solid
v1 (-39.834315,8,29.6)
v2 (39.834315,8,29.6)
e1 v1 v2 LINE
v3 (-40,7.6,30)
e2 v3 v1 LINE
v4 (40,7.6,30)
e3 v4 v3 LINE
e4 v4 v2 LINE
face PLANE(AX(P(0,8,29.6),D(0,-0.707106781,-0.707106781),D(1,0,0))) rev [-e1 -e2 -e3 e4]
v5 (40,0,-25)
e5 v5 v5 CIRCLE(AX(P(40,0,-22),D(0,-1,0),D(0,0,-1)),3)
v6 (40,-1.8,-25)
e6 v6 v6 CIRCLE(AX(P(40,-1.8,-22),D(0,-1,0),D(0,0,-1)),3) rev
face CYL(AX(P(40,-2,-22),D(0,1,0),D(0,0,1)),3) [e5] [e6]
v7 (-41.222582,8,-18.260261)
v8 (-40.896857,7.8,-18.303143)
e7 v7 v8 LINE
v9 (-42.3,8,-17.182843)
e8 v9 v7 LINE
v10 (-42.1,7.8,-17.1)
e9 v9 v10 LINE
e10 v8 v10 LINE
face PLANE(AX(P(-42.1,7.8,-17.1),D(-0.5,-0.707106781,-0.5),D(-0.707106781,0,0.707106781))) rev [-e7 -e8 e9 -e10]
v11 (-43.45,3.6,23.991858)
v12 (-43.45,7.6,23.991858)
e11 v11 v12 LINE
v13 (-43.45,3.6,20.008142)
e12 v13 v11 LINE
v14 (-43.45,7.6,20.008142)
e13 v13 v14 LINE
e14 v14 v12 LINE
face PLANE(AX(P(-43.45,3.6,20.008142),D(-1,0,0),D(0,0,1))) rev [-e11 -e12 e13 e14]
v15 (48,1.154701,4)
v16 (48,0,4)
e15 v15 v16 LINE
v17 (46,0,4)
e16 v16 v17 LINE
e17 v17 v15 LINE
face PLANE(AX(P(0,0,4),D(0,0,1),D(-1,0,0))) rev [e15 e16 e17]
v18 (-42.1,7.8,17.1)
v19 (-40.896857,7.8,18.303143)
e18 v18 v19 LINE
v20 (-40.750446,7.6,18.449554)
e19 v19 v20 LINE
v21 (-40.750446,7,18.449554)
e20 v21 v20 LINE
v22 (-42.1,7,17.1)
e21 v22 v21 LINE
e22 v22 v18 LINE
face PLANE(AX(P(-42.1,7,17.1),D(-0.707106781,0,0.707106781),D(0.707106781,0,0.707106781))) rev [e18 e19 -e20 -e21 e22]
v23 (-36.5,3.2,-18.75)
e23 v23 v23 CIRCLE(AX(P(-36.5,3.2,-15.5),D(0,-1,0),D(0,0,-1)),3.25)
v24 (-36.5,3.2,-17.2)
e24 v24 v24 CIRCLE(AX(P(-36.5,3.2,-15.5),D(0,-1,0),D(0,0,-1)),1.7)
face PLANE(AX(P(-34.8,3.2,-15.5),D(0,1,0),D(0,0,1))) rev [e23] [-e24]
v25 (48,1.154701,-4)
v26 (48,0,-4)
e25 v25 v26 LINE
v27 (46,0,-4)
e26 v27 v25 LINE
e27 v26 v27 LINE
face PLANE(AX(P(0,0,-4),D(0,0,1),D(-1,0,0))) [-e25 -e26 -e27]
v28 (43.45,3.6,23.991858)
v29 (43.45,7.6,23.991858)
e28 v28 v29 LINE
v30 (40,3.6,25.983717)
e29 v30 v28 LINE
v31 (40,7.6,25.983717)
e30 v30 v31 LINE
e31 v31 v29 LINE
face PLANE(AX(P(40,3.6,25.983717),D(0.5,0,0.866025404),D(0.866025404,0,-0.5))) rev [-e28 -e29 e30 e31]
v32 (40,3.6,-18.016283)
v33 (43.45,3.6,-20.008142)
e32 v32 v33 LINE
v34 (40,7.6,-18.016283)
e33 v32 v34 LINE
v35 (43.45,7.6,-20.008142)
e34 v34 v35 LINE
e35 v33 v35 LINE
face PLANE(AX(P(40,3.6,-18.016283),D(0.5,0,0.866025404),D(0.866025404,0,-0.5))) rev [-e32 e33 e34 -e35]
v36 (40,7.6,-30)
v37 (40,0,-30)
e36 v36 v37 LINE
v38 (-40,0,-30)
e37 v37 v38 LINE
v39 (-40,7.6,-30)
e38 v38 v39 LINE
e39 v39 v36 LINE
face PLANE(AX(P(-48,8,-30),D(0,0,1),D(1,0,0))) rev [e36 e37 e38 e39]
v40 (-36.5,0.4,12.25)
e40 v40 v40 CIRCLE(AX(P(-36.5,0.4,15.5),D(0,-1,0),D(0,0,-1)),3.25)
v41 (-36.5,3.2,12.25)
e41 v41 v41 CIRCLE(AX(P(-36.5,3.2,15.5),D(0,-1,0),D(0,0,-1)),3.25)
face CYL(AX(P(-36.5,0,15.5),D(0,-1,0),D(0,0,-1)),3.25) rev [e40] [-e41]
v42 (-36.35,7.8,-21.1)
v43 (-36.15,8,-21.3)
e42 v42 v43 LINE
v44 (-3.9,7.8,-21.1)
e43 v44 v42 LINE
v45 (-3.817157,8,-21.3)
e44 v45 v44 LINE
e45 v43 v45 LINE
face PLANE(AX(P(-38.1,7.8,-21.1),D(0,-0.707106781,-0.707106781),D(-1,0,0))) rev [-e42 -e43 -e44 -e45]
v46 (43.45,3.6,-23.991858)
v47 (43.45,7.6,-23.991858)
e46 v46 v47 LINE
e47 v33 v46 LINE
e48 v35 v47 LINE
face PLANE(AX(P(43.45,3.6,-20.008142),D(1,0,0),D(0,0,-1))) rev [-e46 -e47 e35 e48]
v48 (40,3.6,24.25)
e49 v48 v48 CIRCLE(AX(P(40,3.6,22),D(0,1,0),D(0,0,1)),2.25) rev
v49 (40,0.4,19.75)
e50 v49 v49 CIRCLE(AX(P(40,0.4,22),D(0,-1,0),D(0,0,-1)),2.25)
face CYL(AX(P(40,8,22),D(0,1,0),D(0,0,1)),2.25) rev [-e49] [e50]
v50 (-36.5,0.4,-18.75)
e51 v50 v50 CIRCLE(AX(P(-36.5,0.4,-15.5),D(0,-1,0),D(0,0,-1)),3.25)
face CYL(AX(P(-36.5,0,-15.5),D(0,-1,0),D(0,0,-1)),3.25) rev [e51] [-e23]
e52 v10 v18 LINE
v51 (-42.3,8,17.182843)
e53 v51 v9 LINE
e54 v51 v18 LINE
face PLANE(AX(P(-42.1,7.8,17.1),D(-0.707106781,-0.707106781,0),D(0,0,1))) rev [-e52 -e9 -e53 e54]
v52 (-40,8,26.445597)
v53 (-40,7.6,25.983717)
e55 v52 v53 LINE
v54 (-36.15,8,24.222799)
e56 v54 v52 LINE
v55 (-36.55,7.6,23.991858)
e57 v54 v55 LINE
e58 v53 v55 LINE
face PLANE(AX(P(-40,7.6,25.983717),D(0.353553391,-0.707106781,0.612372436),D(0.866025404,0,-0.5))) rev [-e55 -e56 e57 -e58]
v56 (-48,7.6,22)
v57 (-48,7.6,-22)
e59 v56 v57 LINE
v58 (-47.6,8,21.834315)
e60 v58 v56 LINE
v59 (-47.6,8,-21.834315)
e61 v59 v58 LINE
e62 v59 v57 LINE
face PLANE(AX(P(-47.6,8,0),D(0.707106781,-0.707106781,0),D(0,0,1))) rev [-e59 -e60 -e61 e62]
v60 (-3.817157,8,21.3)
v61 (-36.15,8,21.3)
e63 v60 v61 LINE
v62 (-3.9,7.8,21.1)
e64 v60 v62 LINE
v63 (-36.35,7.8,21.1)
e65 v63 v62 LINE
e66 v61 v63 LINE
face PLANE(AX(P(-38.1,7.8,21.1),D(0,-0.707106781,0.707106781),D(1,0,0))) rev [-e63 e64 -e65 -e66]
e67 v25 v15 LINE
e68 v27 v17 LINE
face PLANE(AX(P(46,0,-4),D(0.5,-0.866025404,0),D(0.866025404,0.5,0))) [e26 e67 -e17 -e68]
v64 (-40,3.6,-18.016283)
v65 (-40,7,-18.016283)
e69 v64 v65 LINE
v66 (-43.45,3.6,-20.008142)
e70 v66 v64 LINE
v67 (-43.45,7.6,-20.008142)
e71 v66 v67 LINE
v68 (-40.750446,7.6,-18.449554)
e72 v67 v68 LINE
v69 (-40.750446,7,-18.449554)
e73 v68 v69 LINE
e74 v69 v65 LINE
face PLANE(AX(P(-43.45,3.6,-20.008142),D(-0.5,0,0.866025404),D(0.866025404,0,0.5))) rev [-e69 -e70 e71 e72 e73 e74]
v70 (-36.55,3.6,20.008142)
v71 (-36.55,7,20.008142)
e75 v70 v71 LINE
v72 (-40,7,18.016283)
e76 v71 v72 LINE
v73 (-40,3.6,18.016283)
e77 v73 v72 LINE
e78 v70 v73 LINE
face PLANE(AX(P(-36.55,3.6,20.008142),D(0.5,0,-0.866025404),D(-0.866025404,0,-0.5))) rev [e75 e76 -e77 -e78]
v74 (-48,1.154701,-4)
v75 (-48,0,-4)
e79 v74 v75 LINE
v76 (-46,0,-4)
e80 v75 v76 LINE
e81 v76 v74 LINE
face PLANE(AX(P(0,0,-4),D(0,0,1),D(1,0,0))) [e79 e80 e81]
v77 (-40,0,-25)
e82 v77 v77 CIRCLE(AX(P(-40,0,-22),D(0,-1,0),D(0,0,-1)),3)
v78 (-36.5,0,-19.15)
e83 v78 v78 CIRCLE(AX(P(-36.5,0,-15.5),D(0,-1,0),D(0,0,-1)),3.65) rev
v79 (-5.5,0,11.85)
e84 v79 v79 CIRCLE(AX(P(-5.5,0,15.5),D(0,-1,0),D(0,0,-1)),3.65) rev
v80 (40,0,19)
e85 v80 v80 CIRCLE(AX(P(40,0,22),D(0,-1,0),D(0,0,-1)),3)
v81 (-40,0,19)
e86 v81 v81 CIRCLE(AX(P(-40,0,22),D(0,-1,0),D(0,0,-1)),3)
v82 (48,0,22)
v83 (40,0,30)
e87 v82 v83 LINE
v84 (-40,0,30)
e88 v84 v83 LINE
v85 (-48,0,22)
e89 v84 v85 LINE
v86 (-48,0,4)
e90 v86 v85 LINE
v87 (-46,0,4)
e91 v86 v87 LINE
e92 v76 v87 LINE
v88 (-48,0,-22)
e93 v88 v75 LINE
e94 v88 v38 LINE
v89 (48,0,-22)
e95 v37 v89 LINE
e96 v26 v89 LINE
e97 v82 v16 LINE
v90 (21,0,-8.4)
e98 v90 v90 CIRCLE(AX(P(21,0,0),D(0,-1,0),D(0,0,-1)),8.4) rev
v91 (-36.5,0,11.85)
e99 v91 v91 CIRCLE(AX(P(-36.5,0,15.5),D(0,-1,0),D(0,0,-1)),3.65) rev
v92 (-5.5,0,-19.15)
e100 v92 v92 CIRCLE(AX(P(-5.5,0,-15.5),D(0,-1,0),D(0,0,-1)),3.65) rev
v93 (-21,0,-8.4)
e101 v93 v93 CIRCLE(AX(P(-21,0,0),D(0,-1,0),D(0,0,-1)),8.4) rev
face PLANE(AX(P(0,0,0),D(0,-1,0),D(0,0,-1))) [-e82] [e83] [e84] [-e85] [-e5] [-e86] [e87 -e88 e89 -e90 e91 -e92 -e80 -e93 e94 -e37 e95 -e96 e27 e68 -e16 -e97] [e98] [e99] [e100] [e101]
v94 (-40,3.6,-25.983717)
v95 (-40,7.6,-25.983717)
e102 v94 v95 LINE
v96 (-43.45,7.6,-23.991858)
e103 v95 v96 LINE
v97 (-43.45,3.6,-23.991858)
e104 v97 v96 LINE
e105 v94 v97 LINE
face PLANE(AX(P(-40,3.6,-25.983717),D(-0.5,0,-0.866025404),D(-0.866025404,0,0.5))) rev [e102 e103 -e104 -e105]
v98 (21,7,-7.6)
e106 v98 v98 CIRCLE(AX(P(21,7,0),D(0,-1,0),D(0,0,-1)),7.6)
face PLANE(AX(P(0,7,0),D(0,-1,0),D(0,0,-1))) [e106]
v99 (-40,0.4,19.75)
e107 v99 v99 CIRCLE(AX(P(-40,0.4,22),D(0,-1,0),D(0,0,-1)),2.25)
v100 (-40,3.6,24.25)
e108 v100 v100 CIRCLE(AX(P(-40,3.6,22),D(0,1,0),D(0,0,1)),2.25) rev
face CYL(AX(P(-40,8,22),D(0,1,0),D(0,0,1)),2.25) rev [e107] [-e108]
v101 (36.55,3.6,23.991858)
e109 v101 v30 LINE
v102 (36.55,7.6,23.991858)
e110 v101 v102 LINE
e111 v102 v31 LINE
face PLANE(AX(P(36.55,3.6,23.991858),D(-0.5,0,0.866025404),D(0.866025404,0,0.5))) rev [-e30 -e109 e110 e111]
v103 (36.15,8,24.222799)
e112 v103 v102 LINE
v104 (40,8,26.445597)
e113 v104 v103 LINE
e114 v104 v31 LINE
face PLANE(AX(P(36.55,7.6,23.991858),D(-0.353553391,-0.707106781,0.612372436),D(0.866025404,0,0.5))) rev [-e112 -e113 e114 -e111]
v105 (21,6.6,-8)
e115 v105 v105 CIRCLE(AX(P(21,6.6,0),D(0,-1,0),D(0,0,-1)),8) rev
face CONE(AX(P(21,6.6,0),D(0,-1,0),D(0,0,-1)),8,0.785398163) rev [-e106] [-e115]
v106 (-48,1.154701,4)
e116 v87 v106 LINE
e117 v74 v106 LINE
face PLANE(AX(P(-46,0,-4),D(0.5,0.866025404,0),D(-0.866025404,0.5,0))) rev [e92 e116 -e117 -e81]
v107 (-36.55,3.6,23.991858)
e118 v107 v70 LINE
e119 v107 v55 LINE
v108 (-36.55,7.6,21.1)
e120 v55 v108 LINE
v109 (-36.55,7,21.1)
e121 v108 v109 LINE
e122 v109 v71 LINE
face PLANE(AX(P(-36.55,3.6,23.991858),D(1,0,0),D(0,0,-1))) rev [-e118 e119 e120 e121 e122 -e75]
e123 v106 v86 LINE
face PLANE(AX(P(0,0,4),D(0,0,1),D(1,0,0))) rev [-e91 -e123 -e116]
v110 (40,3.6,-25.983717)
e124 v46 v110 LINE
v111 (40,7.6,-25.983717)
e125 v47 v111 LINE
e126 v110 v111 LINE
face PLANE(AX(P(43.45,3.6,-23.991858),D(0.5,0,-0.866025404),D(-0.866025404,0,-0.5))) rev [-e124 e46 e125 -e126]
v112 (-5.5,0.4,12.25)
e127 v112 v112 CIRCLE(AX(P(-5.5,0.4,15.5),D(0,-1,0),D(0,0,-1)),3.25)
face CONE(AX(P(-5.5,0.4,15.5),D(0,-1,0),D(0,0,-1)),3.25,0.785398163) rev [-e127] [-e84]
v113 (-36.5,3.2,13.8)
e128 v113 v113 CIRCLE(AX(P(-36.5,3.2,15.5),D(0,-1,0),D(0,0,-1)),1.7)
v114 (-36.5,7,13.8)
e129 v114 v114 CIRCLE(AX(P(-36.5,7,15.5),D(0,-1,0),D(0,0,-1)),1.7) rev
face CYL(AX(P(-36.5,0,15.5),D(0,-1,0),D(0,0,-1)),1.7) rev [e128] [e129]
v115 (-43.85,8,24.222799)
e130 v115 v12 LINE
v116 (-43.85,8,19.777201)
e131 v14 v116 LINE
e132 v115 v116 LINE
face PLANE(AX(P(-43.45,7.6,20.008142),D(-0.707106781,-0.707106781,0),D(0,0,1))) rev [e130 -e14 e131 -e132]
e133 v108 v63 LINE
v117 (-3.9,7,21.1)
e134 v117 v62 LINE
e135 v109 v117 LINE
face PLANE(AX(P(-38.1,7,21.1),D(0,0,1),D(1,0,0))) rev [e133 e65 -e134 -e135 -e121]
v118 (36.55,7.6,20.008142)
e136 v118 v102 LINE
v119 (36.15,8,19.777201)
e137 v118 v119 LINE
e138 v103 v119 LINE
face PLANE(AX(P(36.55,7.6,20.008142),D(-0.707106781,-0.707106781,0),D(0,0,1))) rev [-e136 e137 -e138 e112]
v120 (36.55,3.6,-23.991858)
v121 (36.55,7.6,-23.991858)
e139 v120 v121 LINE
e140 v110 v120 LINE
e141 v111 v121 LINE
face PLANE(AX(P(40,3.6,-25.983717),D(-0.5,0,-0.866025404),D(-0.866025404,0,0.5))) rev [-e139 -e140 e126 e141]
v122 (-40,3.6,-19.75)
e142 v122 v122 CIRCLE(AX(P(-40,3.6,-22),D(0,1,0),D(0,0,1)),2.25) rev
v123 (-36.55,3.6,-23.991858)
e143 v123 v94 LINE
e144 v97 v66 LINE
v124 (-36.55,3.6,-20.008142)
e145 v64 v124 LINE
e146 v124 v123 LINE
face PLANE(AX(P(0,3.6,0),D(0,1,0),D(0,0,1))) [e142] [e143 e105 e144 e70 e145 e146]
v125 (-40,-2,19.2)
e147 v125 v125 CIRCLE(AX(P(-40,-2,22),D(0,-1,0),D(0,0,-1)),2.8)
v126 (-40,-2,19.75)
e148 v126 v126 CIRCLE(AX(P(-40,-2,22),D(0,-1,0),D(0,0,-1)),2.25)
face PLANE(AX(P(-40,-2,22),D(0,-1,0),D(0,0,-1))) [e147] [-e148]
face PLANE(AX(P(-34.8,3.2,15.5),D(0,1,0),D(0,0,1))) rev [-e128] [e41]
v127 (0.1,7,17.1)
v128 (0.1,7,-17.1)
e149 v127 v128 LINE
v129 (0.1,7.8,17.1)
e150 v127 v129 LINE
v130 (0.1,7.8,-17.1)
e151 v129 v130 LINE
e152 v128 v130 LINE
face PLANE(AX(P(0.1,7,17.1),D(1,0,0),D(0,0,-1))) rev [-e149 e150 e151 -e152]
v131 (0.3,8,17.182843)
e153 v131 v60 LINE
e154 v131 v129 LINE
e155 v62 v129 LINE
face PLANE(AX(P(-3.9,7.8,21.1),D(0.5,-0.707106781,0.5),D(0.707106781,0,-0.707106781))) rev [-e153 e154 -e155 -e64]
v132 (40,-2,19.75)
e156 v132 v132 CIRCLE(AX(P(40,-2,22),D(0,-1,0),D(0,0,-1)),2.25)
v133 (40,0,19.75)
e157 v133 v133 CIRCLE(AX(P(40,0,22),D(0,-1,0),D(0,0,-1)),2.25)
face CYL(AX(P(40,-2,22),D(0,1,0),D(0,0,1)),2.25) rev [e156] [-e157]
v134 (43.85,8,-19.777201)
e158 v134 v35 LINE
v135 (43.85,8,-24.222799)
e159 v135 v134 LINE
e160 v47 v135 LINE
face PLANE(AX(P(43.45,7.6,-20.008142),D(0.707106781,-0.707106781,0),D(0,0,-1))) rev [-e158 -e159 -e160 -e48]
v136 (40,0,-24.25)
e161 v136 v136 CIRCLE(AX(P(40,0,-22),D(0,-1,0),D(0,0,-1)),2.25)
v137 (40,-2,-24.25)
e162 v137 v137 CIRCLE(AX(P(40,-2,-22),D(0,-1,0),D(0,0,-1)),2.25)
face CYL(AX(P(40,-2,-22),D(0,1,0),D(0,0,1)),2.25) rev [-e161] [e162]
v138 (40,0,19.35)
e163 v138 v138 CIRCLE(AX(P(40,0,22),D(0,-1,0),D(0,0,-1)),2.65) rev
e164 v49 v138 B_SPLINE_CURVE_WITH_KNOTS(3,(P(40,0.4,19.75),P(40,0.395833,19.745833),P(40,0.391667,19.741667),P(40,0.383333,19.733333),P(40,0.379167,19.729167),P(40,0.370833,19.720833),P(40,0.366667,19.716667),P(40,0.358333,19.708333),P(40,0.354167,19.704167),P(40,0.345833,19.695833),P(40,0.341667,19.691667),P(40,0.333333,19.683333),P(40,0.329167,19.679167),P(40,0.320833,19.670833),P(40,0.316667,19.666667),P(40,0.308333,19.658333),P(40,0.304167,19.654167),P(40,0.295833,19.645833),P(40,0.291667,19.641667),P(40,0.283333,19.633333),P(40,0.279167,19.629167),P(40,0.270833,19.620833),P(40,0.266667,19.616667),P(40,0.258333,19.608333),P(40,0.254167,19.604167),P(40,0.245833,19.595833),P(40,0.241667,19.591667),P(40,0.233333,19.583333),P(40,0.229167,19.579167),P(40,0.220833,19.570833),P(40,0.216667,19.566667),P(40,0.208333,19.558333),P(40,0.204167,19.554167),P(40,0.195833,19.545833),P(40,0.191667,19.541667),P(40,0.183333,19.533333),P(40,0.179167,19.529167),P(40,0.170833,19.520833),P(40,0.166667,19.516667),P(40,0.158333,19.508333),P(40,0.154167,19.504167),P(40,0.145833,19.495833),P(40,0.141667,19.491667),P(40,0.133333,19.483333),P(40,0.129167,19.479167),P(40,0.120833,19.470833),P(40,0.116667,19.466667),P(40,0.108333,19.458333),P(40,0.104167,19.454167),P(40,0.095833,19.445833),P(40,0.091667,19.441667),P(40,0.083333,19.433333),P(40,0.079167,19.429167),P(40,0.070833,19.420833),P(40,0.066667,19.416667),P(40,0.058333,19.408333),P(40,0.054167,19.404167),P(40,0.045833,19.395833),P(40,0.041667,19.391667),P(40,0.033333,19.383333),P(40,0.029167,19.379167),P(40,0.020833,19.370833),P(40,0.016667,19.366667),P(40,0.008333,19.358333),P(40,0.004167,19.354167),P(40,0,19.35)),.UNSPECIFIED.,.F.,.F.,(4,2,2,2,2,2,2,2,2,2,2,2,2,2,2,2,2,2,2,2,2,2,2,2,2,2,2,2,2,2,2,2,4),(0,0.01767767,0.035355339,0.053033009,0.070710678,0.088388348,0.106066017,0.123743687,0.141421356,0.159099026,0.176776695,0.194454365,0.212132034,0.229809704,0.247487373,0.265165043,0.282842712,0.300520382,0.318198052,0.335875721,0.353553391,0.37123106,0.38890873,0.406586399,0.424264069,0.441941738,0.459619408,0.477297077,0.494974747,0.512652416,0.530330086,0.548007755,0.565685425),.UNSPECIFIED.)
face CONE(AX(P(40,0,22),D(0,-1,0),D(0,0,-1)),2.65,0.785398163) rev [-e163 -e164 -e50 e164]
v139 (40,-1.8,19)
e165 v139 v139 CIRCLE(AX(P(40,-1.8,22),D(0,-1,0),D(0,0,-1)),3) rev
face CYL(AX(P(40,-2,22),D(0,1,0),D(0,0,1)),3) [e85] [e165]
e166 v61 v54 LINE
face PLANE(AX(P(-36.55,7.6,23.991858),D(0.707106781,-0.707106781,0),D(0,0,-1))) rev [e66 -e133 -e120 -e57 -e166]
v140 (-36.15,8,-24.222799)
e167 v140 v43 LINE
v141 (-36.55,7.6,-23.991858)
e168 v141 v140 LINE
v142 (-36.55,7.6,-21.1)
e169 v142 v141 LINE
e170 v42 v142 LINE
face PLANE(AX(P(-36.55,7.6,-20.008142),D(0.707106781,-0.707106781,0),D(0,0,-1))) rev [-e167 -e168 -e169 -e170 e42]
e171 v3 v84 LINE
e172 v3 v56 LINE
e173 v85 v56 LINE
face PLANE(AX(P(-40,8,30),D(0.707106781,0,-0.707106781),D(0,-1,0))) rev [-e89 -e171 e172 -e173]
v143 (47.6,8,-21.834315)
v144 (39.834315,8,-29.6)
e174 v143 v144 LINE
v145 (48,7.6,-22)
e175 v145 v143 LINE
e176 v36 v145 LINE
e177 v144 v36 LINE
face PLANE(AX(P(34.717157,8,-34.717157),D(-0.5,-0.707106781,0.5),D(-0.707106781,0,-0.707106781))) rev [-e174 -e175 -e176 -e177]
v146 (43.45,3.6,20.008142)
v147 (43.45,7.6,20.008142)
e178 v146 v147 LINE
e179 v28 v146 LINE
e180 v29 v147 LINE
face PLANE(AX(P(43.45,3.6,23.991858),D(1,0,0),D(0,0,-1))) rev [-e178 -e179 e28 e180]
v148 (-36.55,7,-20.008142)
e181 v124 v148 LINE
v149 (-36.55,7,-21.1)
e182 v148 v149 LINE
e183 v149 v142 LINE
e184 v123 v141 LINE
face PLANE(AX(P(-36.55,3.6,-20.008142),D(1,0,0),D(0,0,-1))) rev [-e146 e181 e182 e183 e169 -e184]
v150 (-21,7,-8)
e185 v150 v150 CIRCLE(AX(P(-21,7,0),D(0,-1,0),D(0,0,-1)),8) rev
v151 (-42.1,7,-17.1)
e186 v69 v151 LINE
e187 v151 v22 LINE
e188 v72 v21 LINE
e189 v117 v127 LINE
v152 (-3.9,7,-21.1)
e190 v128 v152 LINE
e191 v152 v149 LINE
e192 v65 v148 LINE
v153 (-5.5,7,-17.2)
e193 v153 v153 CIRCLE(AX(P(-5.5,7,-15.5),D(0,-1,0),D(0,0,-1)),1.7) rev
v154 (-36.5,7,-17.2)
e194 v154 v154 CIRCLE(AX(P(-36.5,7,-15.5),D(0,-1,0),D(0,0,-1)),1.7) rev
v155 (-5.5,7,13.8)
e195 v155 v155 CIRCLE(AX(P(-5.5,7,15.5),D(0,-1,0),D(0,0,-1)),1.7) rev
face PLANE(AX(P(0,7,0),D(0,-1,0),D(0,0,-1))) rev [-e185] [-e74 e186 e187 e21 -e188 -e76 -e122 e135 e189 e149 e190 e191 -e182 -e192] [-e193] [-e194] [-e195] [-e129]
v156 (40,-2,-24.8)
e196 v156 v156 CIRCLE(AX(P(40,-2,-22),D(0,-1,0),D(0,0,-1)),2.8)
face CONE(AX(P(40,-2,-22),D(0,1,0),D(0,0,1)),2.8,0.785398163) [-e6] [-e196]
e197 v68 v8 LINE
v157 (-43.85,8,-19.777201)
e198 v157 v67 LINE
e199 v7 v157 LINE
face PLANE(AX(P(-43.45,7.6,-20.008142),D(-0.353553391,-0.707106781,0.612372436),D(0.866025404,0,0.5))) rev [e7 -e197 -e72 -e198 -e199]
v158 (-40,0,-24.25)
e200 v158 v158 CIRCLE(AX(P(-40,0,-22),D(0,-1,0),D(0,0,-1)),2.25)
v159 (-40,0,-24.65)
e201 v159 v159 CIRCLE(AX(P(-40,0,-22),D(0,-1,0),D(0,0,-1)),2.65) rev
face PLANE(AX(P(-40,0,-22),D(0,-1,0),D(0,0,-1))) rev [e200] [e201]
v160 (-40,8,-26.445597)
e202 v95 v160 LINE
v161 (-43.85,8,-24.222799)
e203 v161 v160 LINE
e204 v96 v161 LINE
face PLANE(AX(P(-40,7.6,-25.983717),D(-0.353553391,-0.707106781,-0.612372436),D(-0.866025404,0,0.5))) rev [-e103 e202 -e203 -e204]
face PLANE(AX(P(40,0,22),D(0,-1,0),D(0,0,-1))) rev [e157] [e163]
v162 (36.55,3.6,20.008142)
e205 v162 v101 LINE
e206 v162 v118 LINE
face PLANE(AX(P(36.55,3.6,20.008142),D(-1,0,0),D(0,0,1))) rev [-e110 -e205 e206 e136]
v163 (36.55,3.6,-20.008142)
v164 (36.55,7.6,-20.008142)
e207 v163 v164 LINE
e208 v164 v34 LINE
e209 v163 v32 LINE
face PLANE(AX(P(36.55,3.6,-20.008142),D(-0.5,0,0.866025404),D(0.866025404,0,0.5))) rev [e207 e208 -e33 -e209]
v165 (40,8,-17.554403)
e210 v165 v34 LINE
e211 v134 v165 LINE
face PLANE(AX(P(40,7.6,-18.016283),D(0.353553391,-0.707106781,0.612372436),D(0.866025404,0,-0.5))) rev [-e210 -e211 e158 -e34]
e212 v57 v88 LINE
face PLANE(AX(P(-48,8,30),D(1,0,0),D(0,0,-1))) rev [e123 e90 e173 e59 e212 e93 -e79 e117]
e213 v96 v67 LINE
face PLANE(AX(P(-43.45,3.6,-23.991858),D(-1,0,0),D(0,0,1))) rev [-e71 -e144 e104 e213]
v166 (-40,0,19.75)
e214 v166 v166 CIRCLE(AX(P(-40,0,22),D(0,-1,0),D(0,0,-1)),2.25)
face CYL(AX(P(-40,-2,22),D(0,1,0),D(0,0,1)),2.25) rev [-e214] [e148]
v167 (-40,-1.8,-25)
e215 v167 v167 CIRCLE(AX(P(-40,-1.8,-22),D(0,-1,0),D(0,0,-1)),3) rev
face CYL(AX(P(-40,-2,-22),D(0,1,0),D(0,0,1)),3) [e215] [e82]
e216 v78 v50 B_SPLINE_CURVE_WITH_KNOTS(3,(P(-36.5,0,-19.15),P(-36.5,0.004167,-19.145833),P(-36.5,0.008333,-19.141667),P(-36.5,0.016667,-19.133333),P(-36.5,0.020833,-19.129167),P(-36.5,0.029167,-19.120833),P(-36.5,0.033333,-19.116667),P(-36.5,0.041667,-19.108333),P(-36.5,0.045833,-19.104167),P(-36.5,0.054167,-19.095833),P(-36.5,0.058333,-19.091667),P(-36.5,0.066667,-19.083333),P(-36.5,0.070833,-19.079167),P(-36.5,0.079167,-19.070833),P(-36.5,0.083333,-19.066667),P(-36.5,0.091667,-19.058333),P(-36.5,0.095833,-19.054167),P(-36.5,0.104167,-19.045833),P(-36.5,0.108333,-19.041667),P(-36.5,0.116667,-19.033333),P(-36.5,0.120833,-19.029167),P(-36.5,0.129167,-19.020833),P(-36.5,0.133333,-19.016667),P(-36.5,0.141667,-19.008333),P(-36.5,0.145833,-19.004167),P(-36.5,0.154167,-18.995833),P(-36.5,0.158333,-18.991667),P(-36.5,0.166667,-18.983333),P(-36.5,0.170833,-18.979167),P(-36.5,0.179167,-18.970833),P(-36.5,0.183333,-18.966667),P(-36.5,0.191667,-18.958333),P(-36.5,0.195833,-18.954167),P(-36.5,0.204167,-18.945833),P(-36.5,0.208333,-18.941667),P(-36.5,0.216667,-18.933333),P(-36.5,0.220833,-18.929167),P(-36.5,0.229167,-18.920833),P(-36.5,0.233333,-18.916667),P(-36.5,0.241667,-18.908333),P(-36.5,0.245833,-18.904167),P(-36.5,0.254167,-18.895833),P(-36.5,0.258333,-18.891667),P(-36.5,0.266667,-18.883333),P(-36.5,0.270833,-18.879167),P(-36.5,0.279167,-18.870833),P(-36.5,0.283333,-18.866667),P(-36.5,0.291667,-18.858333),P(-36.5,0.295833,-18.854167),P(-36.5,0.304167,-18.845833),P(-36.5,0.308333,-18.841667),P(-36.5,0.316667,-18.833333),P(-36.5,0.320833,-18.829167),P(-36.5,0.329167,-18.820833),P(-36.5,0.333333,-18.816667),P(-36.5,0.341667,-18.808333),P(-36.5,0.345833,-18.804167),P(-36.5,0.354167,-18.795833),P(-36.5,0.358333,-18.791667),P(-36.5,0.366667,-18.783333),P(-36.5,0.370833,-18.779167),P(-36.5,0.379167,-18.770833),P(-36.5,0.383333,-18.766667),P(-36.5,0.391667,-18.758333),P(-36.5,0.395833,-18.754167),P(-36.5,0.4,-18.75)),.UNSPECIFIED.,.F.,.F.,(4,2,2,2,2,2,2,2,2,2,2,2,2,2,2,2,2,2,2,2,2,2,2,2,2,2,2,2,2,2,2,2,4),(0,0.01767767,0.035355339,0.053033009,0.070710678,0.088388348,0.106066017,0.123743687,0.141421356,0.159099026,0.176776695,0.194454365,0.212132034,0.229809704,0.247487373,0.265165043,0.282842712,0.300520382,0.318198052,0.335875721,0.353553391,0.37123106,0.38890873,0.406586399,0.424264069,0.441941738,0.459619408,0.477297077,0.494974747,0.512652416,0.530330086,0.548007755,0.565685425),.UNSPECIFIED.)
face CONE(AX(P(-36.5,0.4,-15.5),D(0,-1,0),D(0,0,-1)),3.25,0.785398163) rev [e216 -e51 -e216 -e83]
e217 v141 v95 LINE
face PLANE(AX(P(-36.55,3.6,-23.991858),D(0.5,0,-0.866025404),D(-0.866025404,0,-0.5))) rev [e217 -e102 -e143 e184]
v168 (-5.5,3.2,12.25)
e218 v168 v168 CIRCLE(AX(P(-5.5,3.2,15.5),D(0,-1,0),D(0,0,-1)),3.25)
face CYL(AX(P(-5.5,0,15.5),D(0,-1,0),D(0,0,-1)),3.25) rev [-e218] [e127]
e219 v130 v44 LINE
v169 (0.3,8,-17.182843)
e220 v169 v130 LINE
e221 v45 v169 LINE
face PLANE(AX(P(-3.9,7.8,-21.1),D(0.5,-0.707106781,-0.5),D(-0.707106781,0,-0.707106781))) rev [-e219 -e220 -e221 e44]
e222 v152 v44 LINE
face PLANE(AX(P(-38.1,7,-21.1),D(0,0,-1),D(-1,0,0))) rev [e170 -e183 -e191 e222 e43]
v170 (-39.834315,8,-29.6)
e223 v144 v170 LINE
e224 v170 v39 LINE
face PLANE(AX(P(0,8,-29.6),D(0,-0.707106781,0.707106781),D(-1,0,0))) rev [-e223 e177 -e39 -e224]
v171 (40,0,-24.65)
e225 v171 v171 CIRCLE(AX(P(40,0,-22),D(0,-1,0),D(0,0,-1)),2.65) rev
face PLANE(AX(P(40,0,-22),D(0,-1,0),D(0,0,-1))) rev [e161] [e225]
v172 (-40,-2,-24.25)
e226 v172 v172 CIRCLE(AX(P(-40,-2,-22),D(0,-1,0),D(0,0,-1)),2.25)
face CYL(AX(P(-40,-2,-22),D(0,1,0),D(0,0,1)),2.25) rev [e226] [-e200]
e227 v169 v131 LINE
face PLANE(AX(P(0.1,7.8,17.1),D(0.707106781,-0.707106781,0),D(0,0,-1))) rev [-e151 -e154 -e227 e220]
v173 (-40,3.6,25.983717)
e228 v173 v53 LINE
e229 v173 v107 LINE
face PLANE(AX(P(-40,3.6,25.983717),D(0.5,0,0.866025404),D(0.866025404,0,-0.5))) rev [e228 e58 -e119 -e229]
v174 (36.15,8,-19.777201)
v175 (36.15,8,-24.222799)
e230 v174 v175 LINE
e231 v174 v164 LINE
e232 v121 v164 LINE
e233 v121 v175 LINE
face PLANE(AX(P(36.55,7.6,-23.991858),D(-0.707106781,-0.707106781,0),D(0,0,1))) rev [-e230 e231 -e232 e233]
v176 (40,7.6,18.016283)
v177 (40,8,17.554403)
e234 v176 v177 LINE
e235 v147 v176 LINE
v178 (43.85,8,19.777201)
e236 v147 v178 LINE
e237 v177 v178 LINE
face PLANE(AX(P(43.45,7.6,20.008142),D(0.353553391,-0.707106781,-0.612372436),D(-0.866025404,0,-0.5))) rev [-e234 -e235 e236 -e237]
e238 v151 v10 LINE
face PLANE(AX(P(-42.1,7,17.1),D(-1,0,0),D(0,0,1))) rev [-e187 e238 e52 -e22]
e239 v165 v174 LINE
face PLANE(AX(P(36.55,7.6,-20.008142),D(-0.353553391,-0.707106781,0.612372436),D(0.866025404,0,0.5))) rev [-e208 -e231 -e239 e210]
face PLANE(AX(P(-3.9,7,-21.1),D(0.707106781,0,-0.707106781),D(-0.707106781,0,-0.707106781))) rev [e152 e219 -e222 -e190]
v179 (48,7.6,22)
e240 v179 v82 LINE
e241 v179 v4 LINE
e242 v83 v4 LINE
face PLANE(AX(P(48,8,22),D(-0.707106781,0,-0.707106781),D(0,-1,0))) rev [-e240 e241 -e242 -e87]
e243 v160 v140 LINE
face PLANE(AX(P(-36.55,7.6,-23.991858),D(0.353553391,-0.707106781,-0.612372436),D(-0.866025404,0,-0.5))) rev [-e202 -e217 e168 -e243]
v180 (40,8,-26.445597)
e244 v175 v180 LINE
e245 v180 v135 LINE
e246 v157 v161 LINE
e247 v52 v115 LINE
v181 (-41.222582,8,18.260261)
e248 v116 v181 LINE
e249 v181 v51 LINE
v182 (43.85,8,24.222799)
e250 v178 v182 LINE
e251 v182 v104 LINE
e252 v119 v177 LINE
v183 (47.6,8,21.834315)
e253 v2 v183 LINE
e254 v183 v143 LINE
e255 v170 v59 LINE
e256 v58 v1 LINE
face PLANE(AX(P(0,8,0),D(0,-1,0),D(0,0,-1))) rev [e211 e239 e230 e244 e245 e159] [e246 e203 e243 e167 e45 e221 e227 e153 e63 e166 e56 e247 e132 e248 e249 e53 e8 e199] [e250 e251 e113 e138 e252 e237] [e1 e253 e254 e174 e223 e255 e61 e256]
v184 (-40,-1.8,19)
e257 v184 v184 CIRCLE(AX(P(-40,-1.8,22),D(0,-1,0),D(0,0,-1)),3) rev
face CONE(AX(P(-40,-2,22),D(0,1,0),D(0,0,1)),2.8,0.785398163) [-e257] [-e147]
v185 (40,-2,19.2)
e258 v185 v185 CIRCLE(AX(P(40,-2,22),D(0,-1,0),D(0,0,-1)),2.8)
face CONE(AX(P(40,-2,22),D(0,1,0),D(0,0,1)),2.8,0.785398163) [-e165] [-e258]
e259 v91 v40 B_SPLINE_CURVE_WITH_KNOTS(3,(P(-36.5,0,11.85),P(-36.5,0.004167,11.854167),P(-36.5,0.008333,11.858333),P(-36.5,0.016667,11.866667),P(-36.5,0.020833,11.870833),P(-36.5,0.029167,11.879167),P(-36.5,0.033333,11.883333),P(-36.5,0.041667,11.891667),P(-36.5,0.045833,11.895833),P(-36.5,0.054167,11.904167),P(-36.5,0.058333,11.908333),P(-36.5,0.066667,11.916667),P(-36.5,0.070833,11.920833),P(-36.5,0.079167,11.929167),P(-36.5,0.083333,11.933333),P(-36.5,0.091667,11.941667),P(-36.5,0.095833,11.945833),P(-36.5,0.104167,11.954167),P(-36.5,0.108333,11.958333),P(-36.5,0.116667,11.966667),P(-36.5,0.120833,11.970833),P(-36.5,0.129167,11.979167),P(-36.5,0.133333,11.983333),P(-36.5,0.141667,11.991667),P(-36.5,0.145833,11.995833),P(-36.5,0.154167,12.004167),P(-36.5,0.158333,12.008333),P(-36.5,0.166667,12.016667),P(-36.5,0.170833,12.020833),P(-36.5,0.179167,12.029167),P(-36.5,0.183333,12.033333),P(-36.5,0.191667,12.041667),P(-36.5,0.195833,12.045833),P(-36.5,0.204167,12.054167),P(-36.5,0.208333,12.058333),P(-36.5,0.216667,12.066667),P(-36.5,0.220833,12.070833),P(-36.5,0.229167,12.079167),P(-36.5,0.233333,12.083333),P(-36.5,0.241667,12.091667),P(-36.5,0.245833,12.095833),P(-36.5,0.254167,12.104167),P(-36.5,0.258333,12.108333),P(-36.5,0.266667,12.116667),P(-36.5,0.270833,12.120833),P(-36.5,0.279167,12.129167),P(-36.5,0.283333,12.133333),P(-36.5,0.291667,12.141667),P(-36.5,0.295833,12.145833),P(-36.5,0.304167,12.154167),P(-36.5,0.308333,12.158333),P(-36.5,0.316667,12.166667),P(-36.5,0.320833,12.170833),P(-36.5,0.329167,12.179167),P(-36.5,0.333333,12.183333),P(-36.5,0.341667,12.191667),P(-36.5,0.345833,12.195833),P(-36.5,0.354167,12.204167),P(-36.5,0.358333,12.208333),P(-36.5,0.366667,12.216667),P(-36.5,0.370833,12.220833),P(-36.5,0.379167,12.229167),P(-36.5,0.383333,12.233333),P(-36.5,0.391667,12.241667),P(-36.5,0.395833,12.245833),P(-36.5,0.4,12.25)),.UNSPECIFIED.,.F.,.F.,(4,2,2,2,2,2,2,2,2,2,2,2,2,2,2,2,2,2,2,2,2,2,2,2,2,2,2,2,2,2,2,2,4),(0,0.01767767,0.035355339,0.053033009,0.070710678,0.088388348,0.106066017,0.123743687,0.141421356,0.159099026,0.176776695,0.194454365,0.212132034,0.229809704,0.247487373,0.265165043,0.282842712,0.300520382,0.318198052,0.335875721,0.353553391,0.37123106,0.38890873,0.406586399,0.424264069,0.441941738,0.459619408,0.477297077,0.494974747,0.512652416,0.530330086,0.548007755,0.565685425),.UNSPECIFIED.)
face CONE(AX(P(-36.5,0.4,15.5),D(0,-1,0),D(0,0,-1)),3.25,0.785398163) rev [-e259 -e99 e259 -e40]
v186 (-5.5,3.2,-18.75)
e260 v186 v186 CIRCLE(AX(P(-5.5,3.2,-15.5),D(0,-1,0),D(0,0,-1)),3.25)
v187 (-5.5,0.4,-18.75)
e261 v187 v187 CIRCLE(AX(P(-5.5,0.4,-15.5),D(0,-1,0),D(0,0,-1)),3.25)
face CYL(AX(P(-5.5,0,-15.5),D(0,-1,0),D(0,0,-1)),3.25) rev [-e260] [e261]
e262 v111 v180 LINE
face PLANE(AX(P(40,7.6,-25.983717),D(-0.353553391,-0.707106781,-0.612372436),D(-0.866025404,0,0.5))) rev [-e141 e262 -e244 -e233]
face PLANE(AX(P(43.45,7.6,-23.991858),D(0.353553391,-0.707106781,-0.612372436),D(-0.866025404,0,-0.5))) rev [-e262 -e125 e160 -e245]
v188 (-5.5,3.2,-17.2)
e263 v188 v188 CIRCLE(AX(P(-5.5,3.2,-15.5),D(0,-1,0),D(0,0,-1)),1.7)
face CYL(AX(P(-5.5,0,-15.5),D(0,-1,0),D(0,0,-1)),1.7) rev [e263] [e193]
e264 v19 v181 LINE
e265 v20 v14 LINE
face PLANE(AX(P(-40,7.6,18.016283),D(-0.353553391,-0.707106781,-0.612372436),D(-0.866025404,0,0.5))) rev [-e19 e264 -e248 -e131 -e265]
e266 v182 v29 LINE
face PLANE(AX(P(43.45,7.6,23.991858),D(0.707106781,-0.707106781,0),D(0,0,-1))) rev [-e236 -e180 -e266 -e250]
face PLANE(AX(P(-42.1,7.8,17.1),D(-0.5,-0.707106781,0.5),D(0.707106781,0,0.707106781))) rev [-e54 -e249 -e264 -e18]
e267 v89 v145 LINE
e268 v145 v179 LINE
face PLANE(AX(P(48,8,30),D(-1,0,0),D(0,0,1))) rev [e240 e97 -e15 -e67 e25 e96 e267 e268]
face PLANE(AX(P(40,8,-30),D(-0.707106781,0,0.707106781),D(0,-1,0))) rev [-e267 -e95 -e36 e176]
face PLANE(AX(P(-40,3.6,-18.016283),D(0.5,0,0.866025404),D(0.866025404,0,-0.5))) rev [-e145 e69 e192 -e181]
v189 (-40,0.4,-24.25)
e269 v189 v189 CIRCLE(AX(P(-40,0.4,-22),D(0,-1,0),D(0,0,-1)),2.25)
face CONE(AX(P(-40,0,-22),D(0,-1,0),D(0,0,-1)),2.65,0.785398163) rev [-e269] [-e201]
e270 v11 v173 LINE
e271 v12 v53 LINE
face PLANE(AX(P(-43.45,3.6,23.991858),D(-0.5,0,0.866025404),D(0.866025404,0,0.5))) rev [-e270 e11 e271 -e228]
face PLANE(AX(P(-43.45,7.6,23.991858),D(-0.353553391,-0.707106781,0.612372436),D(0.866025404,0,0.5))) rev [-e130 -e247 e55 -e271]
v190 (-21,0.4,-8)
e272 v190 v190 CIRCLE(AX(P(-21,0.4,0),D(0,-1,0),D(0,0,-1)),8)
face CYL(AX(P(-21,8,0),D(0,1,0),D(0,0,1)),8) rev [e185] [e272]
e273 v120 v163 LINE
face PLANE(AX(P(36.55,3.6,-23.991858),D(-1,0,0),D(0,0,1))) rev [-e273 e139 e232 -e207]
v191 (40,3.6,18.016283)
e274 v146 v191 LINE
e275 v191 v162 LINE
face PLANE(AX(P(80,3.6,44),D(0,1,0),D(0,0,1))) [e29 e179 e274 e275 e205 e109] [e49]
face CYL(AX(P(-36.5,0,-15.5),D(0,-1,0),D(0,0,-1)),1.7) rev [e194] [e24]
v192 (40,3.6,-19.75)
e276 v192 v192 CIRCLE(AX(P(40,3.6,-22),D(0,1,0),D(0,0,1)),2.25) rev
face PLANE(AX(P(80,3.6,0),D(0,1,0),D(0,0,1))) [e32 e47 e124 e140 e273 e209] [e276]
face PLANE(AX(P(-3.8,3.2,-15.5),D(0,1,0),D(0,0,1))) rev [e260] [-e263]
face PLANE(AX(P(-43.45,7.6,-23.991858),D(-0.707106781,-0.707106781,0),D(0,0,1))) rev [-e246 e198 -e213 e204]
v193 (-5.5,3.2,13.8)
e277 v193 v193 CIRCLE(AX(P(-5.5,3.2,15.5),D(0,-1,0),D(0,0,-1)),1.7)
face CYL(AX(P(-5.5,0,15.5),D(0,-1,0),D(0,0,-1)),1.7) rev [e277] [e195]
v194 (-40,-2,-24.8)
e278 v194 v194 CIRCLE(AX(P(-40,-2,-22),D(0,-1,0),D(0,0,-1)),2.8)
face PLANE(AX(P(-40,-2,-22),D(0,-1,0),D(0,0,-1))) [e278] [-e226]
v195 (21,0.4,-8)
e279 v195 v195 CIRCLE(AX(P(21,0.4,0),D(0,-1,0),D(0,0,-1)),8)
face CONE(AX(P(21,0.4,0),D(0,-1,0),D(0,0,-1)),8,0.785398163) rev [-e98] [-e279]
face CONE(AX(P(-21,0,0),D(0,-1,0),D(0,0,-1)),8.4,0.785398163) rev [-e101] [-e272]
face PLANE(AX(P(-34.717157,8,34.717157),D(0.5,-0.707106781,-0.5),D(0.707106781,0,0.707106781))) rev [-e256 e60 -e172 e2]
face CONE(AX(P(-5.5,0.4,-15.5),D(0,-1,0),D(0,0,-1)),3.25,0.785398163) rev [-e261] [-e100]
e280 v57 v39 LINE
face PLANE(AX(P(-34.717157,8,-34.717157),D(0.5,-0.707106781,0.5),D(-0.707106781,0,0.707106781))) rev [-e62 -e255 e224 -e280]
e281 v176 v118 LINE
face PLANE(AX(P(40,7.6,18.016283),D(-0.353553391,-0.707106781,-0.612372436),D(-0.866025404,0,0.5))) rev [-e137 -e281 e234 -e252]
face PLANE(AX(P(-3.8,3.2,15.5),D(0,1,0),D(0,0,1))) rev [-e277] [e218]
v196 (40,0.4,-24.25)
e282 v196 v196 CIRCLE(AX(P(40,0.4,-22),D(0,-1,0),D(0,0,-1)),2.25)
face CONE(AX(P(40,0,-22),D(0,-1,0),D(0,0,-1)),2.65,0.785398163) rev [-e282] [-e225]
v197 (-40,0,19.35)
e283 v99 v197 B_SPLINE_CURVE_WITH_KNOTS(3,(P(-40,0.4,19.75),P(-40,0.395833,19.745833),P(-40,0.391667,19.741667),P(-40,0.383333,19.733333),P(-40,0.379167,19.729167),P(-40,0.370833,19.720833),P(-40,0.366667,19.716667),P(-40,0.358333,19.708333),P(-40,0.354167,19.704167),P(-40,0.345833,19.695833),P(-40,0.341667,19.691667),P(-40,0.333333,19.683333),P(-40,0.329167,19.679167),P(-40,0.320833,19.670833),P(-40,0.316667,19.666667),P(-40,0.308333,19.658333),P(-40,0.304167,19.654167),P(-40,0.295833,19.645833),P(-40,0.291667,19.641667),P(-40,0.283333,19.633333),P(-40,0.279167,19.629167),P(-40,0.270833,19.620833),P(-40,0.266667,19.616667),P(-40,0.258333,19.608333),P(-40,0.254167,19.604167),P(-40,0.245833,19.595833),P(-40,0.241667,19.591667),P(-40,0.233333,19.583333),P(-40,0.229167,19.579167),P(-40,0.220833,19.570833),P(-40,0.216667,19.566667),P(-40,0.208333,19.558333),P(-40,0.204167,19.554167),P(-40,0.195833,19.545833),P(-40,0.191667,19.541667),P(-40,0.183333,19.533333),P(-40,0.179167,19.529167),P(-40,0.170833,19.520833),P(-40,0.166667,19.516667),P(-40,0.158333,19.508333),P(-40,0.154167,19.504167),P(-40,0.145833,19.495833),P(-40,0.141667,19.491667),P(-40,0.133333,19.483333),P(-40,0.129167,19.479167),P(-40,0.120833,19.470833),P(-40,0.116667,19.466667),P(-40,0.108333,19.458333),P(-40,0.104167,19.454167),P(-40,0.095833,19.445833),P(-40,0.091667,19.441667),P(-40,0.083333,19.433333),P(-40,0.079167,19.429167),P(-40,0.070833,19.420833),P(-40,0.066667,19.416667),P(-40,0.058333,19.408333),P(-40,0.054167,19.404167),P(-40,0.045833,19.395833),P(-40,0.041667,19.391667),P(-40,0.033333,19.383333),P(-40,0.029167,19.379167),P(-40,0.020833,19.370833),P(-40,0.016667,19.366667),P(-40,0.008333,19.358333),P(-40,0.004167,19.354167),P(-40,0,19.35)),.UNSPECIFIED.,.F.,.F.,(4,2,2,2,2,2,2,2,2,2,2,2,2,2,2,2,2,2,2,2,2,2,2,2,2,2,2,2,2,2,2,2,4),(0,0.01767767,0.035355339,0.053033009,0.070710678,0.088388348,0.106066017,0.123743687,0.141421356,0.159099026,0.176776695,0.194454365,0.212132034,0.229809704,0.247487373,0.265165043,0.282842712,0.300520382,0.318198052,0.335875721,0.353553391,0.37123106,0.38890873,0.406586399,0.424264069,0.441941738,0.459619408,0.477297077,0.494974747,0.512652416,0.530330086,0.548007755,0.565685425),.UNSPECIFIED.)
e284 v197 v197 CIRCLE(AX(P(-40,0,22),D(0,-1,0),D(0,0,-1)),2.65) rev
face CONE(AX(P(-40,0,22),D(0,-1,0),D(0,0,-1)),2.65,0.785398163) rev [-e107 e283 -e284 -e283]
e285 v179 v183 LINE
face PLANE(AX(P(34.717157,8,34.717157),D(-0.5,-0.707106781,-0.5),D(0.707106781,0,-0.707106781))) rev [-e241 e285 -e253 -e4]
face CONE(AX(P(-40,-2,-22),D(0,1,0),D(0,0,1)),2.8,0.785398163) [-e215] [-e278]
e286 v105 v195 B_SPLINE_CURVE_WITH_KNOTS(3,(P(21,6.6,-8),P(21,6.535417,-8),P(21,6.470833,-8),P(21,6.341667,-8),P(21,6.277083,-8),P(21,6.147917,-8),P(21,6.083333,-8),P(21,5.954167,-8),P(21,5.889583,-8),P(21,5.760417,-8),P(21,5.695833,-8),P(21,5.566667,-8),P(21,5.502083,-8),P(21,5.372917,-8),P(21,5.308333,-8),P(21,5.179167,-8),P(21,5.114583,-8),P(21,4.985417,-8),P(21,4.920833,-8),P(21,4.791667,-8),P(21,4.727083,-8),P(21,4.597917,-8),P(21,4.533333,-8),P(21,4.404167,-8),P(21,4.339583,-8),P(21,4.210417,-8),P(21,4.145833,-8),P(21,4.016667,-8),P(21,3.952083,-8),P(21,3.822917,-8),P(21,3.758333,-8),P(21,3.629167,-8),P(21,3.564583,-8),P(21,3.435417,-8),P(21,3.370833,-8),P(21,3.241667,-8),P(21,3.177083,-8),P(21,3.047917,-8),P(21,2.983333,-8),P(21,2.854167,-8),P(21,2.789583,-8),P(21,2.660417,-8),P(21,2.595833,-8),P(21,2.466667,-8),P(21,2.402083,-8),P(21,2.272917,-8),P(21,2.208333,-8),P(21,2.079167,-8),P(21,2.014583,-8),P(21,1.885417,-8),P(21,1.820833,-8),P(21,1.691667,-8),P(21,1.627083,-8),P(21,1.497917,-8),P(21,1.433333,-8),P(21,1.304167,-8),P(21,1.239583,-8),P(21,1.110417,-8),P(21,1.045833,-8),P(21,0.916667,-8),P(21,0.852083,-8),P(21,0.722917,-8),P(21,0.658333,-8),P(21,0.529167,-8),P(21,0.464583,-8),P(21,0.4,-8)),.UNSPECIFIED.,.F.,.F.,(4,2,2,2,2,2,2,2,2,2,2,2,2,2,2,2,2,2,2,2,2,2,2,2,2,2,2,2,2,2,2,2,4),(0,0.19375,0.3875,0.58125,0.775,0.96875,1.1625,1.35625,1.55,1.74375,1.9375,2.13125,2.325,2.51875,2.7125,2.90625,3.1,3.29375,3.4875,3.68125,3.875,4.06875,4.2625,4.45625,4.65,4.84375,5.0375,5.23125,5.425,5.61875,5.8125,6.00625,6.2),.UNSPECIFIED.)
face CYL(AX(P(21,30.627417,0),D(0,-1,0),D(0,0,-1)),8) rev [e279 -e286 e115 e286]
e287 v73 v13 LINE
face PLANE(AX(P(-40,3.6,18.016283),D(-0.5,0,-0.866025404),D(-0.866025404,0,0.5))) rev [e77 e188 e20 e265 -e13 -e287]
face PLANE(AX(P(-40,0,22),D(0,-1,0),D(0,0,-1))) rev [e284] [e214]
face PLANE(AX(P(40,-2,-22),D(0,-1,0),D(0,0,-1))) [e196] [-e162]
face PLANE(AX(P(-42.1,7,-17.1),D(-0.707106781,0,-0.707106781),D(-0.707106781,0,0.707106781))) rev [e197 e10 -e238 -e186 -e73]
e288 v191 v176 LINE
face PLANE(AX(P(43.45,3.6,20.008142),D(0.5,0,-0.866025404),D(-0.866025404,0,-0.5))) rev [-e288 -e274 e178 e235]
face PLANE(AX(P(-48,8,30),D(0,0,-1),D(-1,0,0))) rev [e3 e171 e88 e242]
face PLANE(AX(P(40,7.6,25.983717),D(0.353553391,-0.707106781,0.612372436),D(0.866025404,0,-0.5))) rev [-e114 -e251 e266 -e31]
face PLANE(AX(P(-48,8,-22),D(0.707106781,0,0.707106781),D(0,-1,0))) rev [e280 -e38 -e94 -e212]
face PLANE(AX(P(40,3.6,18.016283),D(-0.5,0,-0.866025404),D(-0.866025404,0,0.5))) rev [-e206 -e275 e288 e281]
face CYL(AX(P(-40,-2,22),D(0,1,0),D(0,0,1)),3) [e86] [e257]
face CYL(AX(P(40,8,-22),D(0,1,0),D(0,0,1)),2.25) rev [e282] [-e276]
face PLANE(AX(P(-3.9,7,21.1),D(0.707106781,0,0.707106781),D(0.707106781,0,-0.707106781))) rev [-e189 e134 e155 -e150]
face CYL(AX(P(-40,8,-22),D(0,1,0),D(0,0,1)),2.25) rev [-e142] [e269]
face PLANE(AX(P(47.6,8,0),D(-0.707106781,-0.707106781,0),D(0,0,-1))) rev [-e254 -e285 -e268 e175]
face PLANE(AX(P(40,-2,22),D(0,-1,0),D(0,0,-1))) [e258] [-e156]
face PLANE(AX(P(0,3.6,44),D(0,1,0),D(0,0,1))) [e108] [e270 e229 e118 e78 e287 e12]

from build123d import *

# Parameters (mm, degrees)
SKETCH1_W                        = 96
SKETCH1_H                        = 60
BOSS_EXTRUDE1_DEPTH              = 8
CHAMFER1_SIZE                    = 8
HOLE2_D                          = 16
SKETCH6_R                        = 8
CUT_EXTRUDE1_DEPTH               = 7
CBORE_FOR_M3_SHCS1_OUTLINE_R     = 3.25
CBORE_FOR_M3_SHCS1_DEPTH         = 3.2
CBORE_START                      = 3.2
CBORE_FOR_M3_SHCS1_2_OUTLINE_R   = 1.7
CBORE_FOR_M3_SHCS1_2_DEPTH       = 4.8
CHAMFER3_SIZE                    = 0.4
SKETCH10_R                       = 3
SKETCH10_R_2                     = 2.25
BOSS_EXTRUDE2_DEPTH              = 2
CHAMFER4_SIZE                    = 0.2
CHAMFER4_OF_SKETCH_PATTERN1_SIZE = 0.2
CUT_EXTRUDE2_DEPTH               = 4
SKETCH14_R                       = 4.025
SKETCH14_R_2                     = 2.25
BOSS_EXTRUDE3_DEPTH              = 4.2
CUT_EXTRUDE3_DEPTH               = 4.4
CHAMFER6_SIZE                    = 0.4
CHAMFER7_SIZE                    = 0.4
CUT_EXTRUDE4_DEPTH               = 1
CHAMFER8_SIZE                    = 0.2


# Read off the part's stored shape, not the designer's step: CBORE for M4 SHCS1, CBORE for M3 SHCS1
with BuildPart() as part:
    # Sketch1 → Boss-Extrude1 (new body)
    with BuildSketch(Plane(origin=(0, 0, 0), x_dir=(1, 0, 0), z_dir=(0, 1, 0))):
        Rectangle(SKETCH1_W, SKETCH1_H)
    extrude(amount=BOSS_EXTRUDE1_DEPTH)

    # CBORE for M4 SHCS1 outline → CBORE for M4 SHCS1 (revolve, cut)
    with BuildSketch(Plane(origin=(40, 0, 22), x_dir=(1, 0, 0), z_dir=(0, 0, 1))):
        Polygon((0, 0), (2.25, 0), (2.25, 3.8), (4, 3.8), (4, 7.975), (4.025, 8), (0, 8), align=None)
    revolve(axis=Axis((40, 0, 22), (0, 1, 0)), mode=Mode.SUBTRACT)

    # CBORE for M4 SHCS1 2 outline → CBORE for M4 SHCS1 2 (revolve, cut)
    with BuildSketch(Plane(origin=(-40, 0, -22), x_dir=(1, 0, 0), z_dir=(0, 0, 1))):
        Polygon((0, 8), (0, 0), (2.25, 0), (2.25, 3.8), (4, 3.8), (4, 7.975), (4.025, 8), align=None)
    revolve(axis=Axis((-40, 0, -22), (0, 1, 0)), mode=Mode.SUBTRACT)

    # CBORE for M4 SHCS1 3 outline → CBORE for M4 SHCS1 3 (revolve, cut)
    with BuildSketch(Plane(origin=(-40, 0, 22), x_dir=(1, 0, 0), z_dir=(0, 0, 1))):
        Polygon((0, 8), (0, 0), (2.25, 0), (2.25, 3.8), (4, 3.8), (4, 7.975), (4.025, 8), align=None)
    revolve(axis=Axis((-40, 0, 22), (0, 1, 0)), mode=Mode.SUBTRACT)

    # CBORE for M4 SHCS1 4 outline → CBORE for M4 SHCS1 4 (revolve, cut)
    with BuildSketch(Plane(origin=(40, 0, -22), x_dir=(1, 0, 0), z_dir=(0, 0, 1))):
        Polygon((0, 8), (0, 0), (2.25, 0), (2.25, 3.8), (4, 3.8), (4, 7.975), (4.025, 8), align=None)
    revolve(axis=Axis((40, 0, -22), (0, 1, 0)), mode=Mode.SUBTRACT)

    # Chamfer1
    chamfer1_edges = [part.edges().sort_by_distance(p)[0] for p in [
        (48, 4, 30),
        (-48, 4, 30),
        (-48, 4, -30),
        (48, 4, -30),
    ]]
    chamfer(chamfer1_edges, length=CHAMFER1_SIZE)

    # Hole2 (through all)
    with Locations(Plane(origin=(0, 8, 0), x_dir=(1, 0, 0), z_dir=(0, 1, 0))):
        with Locations((-21, 0)):
            Hole(HOLE2_D / 2)

    # Sketch6 → Cut-Extrude1 (cut)
    with BuildSketch(Plane.XZ):
        with Locations(Location((21, 0, 0), (0, 0, 270))):
            Circle(SKETCH6_R)
    extrude(amount=-CUT_EXTRUDE1_DEPTH, mode=Mode.SUBTRACT)

    # CBORE for M3 SHCS1 outline → CBORE for M3 SHCS1 (cut)
    with BuildSketch(Plane(origin=(0, 0, 0), x_dir=(1, 0, 0), z_dir=(0, 1, 0))):
        with Locations((-5.5, 15.5)):
            Circle(CBORE_FOR_M3_SHCS1_OUTLINE_R)
        with Locations((-36.5, 15.5)):
            Circle(CBORE_FOR_M3_SHCS1_OUTLINE_R)
        with Locations((-36.5, -15.5)):
            Circle(CBORE_FOR_M3_SHCS1_OUTLINE_R)
        with Locations((-5.5, -15.5)):
            Circle(CBORE_FOR_M3_SHCS1_OUTLINE_R)
    extrude(amount=CBORE_FOR_M3_SHCS1_DEPTH, mode=Mode.SUBTRACT)

    # CBORE for M3 SHCS1 2 outline → CBORE for M3 SHCS1 2 (cut)
    with BuildSketch(Plane(origin=(0, 0, 0), x_dir=(1, 0, 0), z_dir=(0, 1, 0)).offset(CBORE_START)):
        with Locations((-5.5, 15.5)):
            Circle(CBORE_FOR_M3_SHCS1_2_OUTLINE_R)
        with Locations((-36.5, 15.5)):
            Circle(CBORE_FOR_M3_SHCS1_2_OUTLINE_R)
        with Locations((-36.5, -15.5)):
            Circle(CBORE_FOR_M3_SHCS1_2_OUTLINE_R)
        with Locations((-5.5, -15.5)):
            Circle(CBORE_FOR_M3_SHCS1_2_OUTLINE_R)
    extrude(amount=CBORE_FOR_M3_SHCS1_2_DEPTH, mode=Mode.SUBTRACT)

    # Chamfer3
    chamfer3_edges = [part.edges().sort_by_distance(p)[0] for p in [
        (-39.75, 0, 15.5),
        (-8.75, 0, 15.5),
        (37.75, 0, 22),
        (-42.25, 0, -22),
        (-42.25, 0, 22),
        (37.75, 0, -22),
        (-13, 0, 0),
        (-8.75, 0, -15.5),
        (-39.75, 0, -15.5),
    ]]
    chamfer(chamfer3_edges, length=CHAMFER3_SIZE)

    # Sketch10 → Boss-Extrude2 (add)
    with BuildSketch(Plane.XZ):
        with Locations(Location((-40, 22, 0), (0, 0, 270))):
            Circle(SKETCH10_R)
        with Locations(Location((-40, 22, 0), (0, 0, 90))):
            Circle(SKETCH10_R_2, mode=Mode.SUBTRACT)
    boss_extrude2 = extrude(amount=BOSS_EXTRUDE2_DEPTH)

    # Chamfer4
    chamfer4_edges = [part.edges().sort_by_distance(p)[0] for p in [
        (-40, -2, 25),
    ]]
    chamfer(chamfer4_edges, length=CHAMFER4_SIZE)

    # Sketch-Pattern1: Boss-Extrude2 at 3 more places
    with Locations((80, 0, 0), (80, 0, -44), (0, 0, -44)):
        add(boss_extrude2)

    # Chamfer4 of Sketch-Pattern1
    chamfer4_of_sketch_pattern1_edges = [part.edges().sort_by_distance(p)[0] for p in [
        (40, -2, 25),
        (40, -2, -19),
        (-40, -2, -19),
    ]]
    chamfer(chamfer4_of_sketch_pattern1_edges, length=CHAMFER4_OF_SKETCH_PATTERN1_SIZE)

    # Sketch13 → Cut-Extrude2 (cut, symmetric)
    with BuildSketch(Plane.XY):
        Polygon((-48, 0), (-46, 0), (-48, 1.154700538), align=None)
    cut_extrude2 = extrude(amount=CUT_EXTRUDE2_DEPTH, both=True, mode=Mode.SUBTRACT)

    # Mirror1: Cut-Extrude2 across plane
    add(cut_extrude2.mirror(Plane(origin=(0, 0, 0), x_dir=(0, 0, 1), z_dir=(1, 0, 0))), mode=Mode.SUBTRACT)

    # Sketch14 → Boss-Extrude3 (add)
    # profile 1 of 4: a face of its own
    with BuildSketch(Plane(origin=(0, 8, 0), x_dir=(1, 0, 0), z_dir=(0, 1, 0))):
        with Locations((40, 22)):
            Circle(SKETCH14_R)
        with Locations(Location((40, 22, 0), (0, 0, 270))):
            Circle(SKETCH14_R_2, mode=Mode.SUBTRACT)
    # profile 2 of 4: a face of its own
    with BuildSketch(Plane(origin=(0, 8, 0), x_dir=(1, 0, 0), z_dir=(0, 1, 0))):
        with Locations((-40, -22)):
            Circle(SKETCH14_R)
        with Locations(Location((-40, -22, 0), (0, 0, 270))):
            Circle(SKETCH14_R_2, mode=Mode.SUBTRACT)
    # profile 3 of 4: a face of its own
    with BuildSketch(Plane(origin=(0, 8, 0), x_dir=(1, 0, 0), z_dir=(0, 1, 0))):
        with Locations((-40, 22)):
            Circle(SKETCH14_R)
        with Locations(Location((-40, 22, 0), (0, 0, 270))):
            Circle(SKETCH14_R_2, mode=Mode.SUBTRACT)
    # profile 4 of 4: a face of its own
    with BuildSketch(Plane(origin=(0, 8, 0), x_dir=(1, 0, 0), z_dir=(0, 1, 0))):
        with Locations((40, -22)):
            Circle(SKETCH14_R)
        with Locations(Location((40, -22, 0), (0, 0, 270))):
            Circle(SKETCH14_R_2, mode=Mode.SUBTRACT)
    extrude(amount=-BOSS_EXTRUDE3_DEPTH)

    # Sketch15 → Cut-Extrude3 (cut)
    with BuildSketch(Plane(origin=(0, 8, 0), x_dir=(1, 0, 0), z_dir=(0, 1, 0))):
        Polygon((-40, 25.983716857), (-43.45, 23.991858429), (-43.45, 20.008141571), (-40, 18.016283143), (-36.55, 20.008141571), (-36.55, 23.991858429), align=None)
    cut_extrude3 = extrude(amount=-CUT_EXTRUDE3_DEPTH, mode=Mode.SUBTRACT)

    # Sketch-Pattern2: Cut-Extrude3 at 3 more places
    with Locations((0, 0, 44), (80, 0, 44), (80, 0, 0)):
        add(cut_extrude3, mode=Mode.SUBTRACT)

    # Chamfer6
    chamfer6_edges = [part.edges().sort_by_distance(p)[0] for p in [
        (-38.2, 8, 15.5),
        (-7.2, 8, 15.5),
        (-38.275, 8, -24.987787643),
        (-41.725, 8, -24.987787643),
        (-43.45, 8, -22),
        (-41.725, 8, -19.012212357),
        (-38.275, 8, -19.012212357),
        (-36.55, 8, -22),
        (41.725, 8, -24.987787643),
        (38.275, 8, -24.987787643),
        (36.55, 8, -22),
        (38.275, 8, -19.012212357),
        (41.725, 8, -19.012212357),
        (43.45, 8, -22),
        (41.725, 8, 19.012212357),
        (38.275, 8, 19.012212357),
        (36.55, 8, 22),
        (38.275, 8, 24.987787643),
        (41.725, 8, 24.987787643),
        (43.45, 8, 22),
        (-38.275, 8, 19.012212357),
        (-41.725, 8, 19.012212357),
        (-43.45, 8, 22),
        (-41.725, 8, 24.987787643),
        (-38.275, 8, 24.987787643),
        (-36.55, 8, 22),
        (48, 8, 0),
        (0, 8, 30),
        (0, 8, -30),
        (-48, 8, 0),
        (-44, 8, 26),
        (-44, 8, -26),
        (44, 8, -26),
        (44, 8, 26),
        (-13, 8, 0),
        (-7.2, 8, -15.5),
        (-38.2, 8, -15.5),
    ]]
    chamfer(chamfer6_edges, length=CHAMFER6_SIZE)

    # Chamfer7
    chamfer7_edges = [part.edges().sort_by_distance(p)[0] for p in [
        (21, 0, 8),
        (21, 7, 8),
    ]]
    chamfer(chamfer7_edges, length=CHAMFER7_SIZE)

    # Sketch16 → Cut-Extrude4 (cut)
    with BuildSketch(Plane(origin=(0, 8, 0), x_dir=(1, 0, 0), z_dir=(0, 1, 0))):
        Polygon((-42.1, 17.1), (-38.1, 21.1), (-3.9, 21.1), (0.1, 17.1), (0.1, -17.1), (-3.9, -21.1), (-38.1, -21.1), (-42.1, -17.1), align=None)
    extrude(amount=-CUT_EXTRUDE4_DEPTH, mode=Mode.SUBTRACT)

    # Chamfer8
    chamfer8_edges = [part.edges().sort_by_distance(p)[0] for p in [
        (-20.025, 8, -21.1),
        (-41.57163337, 8, -17.62836663),
        (-42.1, 8, 0),
        (-41.57163337, 8, 17.62836663),
        (-20.025, 8, 21.1),
        (-1.9, 8, 19.1),
        (0.1, 8, 0),
        (-1.9, 8, -19.1),
    ]]
    chamfer(chamfer8_edges, length=CHAMFER8_SIZE)


solid = part.part
